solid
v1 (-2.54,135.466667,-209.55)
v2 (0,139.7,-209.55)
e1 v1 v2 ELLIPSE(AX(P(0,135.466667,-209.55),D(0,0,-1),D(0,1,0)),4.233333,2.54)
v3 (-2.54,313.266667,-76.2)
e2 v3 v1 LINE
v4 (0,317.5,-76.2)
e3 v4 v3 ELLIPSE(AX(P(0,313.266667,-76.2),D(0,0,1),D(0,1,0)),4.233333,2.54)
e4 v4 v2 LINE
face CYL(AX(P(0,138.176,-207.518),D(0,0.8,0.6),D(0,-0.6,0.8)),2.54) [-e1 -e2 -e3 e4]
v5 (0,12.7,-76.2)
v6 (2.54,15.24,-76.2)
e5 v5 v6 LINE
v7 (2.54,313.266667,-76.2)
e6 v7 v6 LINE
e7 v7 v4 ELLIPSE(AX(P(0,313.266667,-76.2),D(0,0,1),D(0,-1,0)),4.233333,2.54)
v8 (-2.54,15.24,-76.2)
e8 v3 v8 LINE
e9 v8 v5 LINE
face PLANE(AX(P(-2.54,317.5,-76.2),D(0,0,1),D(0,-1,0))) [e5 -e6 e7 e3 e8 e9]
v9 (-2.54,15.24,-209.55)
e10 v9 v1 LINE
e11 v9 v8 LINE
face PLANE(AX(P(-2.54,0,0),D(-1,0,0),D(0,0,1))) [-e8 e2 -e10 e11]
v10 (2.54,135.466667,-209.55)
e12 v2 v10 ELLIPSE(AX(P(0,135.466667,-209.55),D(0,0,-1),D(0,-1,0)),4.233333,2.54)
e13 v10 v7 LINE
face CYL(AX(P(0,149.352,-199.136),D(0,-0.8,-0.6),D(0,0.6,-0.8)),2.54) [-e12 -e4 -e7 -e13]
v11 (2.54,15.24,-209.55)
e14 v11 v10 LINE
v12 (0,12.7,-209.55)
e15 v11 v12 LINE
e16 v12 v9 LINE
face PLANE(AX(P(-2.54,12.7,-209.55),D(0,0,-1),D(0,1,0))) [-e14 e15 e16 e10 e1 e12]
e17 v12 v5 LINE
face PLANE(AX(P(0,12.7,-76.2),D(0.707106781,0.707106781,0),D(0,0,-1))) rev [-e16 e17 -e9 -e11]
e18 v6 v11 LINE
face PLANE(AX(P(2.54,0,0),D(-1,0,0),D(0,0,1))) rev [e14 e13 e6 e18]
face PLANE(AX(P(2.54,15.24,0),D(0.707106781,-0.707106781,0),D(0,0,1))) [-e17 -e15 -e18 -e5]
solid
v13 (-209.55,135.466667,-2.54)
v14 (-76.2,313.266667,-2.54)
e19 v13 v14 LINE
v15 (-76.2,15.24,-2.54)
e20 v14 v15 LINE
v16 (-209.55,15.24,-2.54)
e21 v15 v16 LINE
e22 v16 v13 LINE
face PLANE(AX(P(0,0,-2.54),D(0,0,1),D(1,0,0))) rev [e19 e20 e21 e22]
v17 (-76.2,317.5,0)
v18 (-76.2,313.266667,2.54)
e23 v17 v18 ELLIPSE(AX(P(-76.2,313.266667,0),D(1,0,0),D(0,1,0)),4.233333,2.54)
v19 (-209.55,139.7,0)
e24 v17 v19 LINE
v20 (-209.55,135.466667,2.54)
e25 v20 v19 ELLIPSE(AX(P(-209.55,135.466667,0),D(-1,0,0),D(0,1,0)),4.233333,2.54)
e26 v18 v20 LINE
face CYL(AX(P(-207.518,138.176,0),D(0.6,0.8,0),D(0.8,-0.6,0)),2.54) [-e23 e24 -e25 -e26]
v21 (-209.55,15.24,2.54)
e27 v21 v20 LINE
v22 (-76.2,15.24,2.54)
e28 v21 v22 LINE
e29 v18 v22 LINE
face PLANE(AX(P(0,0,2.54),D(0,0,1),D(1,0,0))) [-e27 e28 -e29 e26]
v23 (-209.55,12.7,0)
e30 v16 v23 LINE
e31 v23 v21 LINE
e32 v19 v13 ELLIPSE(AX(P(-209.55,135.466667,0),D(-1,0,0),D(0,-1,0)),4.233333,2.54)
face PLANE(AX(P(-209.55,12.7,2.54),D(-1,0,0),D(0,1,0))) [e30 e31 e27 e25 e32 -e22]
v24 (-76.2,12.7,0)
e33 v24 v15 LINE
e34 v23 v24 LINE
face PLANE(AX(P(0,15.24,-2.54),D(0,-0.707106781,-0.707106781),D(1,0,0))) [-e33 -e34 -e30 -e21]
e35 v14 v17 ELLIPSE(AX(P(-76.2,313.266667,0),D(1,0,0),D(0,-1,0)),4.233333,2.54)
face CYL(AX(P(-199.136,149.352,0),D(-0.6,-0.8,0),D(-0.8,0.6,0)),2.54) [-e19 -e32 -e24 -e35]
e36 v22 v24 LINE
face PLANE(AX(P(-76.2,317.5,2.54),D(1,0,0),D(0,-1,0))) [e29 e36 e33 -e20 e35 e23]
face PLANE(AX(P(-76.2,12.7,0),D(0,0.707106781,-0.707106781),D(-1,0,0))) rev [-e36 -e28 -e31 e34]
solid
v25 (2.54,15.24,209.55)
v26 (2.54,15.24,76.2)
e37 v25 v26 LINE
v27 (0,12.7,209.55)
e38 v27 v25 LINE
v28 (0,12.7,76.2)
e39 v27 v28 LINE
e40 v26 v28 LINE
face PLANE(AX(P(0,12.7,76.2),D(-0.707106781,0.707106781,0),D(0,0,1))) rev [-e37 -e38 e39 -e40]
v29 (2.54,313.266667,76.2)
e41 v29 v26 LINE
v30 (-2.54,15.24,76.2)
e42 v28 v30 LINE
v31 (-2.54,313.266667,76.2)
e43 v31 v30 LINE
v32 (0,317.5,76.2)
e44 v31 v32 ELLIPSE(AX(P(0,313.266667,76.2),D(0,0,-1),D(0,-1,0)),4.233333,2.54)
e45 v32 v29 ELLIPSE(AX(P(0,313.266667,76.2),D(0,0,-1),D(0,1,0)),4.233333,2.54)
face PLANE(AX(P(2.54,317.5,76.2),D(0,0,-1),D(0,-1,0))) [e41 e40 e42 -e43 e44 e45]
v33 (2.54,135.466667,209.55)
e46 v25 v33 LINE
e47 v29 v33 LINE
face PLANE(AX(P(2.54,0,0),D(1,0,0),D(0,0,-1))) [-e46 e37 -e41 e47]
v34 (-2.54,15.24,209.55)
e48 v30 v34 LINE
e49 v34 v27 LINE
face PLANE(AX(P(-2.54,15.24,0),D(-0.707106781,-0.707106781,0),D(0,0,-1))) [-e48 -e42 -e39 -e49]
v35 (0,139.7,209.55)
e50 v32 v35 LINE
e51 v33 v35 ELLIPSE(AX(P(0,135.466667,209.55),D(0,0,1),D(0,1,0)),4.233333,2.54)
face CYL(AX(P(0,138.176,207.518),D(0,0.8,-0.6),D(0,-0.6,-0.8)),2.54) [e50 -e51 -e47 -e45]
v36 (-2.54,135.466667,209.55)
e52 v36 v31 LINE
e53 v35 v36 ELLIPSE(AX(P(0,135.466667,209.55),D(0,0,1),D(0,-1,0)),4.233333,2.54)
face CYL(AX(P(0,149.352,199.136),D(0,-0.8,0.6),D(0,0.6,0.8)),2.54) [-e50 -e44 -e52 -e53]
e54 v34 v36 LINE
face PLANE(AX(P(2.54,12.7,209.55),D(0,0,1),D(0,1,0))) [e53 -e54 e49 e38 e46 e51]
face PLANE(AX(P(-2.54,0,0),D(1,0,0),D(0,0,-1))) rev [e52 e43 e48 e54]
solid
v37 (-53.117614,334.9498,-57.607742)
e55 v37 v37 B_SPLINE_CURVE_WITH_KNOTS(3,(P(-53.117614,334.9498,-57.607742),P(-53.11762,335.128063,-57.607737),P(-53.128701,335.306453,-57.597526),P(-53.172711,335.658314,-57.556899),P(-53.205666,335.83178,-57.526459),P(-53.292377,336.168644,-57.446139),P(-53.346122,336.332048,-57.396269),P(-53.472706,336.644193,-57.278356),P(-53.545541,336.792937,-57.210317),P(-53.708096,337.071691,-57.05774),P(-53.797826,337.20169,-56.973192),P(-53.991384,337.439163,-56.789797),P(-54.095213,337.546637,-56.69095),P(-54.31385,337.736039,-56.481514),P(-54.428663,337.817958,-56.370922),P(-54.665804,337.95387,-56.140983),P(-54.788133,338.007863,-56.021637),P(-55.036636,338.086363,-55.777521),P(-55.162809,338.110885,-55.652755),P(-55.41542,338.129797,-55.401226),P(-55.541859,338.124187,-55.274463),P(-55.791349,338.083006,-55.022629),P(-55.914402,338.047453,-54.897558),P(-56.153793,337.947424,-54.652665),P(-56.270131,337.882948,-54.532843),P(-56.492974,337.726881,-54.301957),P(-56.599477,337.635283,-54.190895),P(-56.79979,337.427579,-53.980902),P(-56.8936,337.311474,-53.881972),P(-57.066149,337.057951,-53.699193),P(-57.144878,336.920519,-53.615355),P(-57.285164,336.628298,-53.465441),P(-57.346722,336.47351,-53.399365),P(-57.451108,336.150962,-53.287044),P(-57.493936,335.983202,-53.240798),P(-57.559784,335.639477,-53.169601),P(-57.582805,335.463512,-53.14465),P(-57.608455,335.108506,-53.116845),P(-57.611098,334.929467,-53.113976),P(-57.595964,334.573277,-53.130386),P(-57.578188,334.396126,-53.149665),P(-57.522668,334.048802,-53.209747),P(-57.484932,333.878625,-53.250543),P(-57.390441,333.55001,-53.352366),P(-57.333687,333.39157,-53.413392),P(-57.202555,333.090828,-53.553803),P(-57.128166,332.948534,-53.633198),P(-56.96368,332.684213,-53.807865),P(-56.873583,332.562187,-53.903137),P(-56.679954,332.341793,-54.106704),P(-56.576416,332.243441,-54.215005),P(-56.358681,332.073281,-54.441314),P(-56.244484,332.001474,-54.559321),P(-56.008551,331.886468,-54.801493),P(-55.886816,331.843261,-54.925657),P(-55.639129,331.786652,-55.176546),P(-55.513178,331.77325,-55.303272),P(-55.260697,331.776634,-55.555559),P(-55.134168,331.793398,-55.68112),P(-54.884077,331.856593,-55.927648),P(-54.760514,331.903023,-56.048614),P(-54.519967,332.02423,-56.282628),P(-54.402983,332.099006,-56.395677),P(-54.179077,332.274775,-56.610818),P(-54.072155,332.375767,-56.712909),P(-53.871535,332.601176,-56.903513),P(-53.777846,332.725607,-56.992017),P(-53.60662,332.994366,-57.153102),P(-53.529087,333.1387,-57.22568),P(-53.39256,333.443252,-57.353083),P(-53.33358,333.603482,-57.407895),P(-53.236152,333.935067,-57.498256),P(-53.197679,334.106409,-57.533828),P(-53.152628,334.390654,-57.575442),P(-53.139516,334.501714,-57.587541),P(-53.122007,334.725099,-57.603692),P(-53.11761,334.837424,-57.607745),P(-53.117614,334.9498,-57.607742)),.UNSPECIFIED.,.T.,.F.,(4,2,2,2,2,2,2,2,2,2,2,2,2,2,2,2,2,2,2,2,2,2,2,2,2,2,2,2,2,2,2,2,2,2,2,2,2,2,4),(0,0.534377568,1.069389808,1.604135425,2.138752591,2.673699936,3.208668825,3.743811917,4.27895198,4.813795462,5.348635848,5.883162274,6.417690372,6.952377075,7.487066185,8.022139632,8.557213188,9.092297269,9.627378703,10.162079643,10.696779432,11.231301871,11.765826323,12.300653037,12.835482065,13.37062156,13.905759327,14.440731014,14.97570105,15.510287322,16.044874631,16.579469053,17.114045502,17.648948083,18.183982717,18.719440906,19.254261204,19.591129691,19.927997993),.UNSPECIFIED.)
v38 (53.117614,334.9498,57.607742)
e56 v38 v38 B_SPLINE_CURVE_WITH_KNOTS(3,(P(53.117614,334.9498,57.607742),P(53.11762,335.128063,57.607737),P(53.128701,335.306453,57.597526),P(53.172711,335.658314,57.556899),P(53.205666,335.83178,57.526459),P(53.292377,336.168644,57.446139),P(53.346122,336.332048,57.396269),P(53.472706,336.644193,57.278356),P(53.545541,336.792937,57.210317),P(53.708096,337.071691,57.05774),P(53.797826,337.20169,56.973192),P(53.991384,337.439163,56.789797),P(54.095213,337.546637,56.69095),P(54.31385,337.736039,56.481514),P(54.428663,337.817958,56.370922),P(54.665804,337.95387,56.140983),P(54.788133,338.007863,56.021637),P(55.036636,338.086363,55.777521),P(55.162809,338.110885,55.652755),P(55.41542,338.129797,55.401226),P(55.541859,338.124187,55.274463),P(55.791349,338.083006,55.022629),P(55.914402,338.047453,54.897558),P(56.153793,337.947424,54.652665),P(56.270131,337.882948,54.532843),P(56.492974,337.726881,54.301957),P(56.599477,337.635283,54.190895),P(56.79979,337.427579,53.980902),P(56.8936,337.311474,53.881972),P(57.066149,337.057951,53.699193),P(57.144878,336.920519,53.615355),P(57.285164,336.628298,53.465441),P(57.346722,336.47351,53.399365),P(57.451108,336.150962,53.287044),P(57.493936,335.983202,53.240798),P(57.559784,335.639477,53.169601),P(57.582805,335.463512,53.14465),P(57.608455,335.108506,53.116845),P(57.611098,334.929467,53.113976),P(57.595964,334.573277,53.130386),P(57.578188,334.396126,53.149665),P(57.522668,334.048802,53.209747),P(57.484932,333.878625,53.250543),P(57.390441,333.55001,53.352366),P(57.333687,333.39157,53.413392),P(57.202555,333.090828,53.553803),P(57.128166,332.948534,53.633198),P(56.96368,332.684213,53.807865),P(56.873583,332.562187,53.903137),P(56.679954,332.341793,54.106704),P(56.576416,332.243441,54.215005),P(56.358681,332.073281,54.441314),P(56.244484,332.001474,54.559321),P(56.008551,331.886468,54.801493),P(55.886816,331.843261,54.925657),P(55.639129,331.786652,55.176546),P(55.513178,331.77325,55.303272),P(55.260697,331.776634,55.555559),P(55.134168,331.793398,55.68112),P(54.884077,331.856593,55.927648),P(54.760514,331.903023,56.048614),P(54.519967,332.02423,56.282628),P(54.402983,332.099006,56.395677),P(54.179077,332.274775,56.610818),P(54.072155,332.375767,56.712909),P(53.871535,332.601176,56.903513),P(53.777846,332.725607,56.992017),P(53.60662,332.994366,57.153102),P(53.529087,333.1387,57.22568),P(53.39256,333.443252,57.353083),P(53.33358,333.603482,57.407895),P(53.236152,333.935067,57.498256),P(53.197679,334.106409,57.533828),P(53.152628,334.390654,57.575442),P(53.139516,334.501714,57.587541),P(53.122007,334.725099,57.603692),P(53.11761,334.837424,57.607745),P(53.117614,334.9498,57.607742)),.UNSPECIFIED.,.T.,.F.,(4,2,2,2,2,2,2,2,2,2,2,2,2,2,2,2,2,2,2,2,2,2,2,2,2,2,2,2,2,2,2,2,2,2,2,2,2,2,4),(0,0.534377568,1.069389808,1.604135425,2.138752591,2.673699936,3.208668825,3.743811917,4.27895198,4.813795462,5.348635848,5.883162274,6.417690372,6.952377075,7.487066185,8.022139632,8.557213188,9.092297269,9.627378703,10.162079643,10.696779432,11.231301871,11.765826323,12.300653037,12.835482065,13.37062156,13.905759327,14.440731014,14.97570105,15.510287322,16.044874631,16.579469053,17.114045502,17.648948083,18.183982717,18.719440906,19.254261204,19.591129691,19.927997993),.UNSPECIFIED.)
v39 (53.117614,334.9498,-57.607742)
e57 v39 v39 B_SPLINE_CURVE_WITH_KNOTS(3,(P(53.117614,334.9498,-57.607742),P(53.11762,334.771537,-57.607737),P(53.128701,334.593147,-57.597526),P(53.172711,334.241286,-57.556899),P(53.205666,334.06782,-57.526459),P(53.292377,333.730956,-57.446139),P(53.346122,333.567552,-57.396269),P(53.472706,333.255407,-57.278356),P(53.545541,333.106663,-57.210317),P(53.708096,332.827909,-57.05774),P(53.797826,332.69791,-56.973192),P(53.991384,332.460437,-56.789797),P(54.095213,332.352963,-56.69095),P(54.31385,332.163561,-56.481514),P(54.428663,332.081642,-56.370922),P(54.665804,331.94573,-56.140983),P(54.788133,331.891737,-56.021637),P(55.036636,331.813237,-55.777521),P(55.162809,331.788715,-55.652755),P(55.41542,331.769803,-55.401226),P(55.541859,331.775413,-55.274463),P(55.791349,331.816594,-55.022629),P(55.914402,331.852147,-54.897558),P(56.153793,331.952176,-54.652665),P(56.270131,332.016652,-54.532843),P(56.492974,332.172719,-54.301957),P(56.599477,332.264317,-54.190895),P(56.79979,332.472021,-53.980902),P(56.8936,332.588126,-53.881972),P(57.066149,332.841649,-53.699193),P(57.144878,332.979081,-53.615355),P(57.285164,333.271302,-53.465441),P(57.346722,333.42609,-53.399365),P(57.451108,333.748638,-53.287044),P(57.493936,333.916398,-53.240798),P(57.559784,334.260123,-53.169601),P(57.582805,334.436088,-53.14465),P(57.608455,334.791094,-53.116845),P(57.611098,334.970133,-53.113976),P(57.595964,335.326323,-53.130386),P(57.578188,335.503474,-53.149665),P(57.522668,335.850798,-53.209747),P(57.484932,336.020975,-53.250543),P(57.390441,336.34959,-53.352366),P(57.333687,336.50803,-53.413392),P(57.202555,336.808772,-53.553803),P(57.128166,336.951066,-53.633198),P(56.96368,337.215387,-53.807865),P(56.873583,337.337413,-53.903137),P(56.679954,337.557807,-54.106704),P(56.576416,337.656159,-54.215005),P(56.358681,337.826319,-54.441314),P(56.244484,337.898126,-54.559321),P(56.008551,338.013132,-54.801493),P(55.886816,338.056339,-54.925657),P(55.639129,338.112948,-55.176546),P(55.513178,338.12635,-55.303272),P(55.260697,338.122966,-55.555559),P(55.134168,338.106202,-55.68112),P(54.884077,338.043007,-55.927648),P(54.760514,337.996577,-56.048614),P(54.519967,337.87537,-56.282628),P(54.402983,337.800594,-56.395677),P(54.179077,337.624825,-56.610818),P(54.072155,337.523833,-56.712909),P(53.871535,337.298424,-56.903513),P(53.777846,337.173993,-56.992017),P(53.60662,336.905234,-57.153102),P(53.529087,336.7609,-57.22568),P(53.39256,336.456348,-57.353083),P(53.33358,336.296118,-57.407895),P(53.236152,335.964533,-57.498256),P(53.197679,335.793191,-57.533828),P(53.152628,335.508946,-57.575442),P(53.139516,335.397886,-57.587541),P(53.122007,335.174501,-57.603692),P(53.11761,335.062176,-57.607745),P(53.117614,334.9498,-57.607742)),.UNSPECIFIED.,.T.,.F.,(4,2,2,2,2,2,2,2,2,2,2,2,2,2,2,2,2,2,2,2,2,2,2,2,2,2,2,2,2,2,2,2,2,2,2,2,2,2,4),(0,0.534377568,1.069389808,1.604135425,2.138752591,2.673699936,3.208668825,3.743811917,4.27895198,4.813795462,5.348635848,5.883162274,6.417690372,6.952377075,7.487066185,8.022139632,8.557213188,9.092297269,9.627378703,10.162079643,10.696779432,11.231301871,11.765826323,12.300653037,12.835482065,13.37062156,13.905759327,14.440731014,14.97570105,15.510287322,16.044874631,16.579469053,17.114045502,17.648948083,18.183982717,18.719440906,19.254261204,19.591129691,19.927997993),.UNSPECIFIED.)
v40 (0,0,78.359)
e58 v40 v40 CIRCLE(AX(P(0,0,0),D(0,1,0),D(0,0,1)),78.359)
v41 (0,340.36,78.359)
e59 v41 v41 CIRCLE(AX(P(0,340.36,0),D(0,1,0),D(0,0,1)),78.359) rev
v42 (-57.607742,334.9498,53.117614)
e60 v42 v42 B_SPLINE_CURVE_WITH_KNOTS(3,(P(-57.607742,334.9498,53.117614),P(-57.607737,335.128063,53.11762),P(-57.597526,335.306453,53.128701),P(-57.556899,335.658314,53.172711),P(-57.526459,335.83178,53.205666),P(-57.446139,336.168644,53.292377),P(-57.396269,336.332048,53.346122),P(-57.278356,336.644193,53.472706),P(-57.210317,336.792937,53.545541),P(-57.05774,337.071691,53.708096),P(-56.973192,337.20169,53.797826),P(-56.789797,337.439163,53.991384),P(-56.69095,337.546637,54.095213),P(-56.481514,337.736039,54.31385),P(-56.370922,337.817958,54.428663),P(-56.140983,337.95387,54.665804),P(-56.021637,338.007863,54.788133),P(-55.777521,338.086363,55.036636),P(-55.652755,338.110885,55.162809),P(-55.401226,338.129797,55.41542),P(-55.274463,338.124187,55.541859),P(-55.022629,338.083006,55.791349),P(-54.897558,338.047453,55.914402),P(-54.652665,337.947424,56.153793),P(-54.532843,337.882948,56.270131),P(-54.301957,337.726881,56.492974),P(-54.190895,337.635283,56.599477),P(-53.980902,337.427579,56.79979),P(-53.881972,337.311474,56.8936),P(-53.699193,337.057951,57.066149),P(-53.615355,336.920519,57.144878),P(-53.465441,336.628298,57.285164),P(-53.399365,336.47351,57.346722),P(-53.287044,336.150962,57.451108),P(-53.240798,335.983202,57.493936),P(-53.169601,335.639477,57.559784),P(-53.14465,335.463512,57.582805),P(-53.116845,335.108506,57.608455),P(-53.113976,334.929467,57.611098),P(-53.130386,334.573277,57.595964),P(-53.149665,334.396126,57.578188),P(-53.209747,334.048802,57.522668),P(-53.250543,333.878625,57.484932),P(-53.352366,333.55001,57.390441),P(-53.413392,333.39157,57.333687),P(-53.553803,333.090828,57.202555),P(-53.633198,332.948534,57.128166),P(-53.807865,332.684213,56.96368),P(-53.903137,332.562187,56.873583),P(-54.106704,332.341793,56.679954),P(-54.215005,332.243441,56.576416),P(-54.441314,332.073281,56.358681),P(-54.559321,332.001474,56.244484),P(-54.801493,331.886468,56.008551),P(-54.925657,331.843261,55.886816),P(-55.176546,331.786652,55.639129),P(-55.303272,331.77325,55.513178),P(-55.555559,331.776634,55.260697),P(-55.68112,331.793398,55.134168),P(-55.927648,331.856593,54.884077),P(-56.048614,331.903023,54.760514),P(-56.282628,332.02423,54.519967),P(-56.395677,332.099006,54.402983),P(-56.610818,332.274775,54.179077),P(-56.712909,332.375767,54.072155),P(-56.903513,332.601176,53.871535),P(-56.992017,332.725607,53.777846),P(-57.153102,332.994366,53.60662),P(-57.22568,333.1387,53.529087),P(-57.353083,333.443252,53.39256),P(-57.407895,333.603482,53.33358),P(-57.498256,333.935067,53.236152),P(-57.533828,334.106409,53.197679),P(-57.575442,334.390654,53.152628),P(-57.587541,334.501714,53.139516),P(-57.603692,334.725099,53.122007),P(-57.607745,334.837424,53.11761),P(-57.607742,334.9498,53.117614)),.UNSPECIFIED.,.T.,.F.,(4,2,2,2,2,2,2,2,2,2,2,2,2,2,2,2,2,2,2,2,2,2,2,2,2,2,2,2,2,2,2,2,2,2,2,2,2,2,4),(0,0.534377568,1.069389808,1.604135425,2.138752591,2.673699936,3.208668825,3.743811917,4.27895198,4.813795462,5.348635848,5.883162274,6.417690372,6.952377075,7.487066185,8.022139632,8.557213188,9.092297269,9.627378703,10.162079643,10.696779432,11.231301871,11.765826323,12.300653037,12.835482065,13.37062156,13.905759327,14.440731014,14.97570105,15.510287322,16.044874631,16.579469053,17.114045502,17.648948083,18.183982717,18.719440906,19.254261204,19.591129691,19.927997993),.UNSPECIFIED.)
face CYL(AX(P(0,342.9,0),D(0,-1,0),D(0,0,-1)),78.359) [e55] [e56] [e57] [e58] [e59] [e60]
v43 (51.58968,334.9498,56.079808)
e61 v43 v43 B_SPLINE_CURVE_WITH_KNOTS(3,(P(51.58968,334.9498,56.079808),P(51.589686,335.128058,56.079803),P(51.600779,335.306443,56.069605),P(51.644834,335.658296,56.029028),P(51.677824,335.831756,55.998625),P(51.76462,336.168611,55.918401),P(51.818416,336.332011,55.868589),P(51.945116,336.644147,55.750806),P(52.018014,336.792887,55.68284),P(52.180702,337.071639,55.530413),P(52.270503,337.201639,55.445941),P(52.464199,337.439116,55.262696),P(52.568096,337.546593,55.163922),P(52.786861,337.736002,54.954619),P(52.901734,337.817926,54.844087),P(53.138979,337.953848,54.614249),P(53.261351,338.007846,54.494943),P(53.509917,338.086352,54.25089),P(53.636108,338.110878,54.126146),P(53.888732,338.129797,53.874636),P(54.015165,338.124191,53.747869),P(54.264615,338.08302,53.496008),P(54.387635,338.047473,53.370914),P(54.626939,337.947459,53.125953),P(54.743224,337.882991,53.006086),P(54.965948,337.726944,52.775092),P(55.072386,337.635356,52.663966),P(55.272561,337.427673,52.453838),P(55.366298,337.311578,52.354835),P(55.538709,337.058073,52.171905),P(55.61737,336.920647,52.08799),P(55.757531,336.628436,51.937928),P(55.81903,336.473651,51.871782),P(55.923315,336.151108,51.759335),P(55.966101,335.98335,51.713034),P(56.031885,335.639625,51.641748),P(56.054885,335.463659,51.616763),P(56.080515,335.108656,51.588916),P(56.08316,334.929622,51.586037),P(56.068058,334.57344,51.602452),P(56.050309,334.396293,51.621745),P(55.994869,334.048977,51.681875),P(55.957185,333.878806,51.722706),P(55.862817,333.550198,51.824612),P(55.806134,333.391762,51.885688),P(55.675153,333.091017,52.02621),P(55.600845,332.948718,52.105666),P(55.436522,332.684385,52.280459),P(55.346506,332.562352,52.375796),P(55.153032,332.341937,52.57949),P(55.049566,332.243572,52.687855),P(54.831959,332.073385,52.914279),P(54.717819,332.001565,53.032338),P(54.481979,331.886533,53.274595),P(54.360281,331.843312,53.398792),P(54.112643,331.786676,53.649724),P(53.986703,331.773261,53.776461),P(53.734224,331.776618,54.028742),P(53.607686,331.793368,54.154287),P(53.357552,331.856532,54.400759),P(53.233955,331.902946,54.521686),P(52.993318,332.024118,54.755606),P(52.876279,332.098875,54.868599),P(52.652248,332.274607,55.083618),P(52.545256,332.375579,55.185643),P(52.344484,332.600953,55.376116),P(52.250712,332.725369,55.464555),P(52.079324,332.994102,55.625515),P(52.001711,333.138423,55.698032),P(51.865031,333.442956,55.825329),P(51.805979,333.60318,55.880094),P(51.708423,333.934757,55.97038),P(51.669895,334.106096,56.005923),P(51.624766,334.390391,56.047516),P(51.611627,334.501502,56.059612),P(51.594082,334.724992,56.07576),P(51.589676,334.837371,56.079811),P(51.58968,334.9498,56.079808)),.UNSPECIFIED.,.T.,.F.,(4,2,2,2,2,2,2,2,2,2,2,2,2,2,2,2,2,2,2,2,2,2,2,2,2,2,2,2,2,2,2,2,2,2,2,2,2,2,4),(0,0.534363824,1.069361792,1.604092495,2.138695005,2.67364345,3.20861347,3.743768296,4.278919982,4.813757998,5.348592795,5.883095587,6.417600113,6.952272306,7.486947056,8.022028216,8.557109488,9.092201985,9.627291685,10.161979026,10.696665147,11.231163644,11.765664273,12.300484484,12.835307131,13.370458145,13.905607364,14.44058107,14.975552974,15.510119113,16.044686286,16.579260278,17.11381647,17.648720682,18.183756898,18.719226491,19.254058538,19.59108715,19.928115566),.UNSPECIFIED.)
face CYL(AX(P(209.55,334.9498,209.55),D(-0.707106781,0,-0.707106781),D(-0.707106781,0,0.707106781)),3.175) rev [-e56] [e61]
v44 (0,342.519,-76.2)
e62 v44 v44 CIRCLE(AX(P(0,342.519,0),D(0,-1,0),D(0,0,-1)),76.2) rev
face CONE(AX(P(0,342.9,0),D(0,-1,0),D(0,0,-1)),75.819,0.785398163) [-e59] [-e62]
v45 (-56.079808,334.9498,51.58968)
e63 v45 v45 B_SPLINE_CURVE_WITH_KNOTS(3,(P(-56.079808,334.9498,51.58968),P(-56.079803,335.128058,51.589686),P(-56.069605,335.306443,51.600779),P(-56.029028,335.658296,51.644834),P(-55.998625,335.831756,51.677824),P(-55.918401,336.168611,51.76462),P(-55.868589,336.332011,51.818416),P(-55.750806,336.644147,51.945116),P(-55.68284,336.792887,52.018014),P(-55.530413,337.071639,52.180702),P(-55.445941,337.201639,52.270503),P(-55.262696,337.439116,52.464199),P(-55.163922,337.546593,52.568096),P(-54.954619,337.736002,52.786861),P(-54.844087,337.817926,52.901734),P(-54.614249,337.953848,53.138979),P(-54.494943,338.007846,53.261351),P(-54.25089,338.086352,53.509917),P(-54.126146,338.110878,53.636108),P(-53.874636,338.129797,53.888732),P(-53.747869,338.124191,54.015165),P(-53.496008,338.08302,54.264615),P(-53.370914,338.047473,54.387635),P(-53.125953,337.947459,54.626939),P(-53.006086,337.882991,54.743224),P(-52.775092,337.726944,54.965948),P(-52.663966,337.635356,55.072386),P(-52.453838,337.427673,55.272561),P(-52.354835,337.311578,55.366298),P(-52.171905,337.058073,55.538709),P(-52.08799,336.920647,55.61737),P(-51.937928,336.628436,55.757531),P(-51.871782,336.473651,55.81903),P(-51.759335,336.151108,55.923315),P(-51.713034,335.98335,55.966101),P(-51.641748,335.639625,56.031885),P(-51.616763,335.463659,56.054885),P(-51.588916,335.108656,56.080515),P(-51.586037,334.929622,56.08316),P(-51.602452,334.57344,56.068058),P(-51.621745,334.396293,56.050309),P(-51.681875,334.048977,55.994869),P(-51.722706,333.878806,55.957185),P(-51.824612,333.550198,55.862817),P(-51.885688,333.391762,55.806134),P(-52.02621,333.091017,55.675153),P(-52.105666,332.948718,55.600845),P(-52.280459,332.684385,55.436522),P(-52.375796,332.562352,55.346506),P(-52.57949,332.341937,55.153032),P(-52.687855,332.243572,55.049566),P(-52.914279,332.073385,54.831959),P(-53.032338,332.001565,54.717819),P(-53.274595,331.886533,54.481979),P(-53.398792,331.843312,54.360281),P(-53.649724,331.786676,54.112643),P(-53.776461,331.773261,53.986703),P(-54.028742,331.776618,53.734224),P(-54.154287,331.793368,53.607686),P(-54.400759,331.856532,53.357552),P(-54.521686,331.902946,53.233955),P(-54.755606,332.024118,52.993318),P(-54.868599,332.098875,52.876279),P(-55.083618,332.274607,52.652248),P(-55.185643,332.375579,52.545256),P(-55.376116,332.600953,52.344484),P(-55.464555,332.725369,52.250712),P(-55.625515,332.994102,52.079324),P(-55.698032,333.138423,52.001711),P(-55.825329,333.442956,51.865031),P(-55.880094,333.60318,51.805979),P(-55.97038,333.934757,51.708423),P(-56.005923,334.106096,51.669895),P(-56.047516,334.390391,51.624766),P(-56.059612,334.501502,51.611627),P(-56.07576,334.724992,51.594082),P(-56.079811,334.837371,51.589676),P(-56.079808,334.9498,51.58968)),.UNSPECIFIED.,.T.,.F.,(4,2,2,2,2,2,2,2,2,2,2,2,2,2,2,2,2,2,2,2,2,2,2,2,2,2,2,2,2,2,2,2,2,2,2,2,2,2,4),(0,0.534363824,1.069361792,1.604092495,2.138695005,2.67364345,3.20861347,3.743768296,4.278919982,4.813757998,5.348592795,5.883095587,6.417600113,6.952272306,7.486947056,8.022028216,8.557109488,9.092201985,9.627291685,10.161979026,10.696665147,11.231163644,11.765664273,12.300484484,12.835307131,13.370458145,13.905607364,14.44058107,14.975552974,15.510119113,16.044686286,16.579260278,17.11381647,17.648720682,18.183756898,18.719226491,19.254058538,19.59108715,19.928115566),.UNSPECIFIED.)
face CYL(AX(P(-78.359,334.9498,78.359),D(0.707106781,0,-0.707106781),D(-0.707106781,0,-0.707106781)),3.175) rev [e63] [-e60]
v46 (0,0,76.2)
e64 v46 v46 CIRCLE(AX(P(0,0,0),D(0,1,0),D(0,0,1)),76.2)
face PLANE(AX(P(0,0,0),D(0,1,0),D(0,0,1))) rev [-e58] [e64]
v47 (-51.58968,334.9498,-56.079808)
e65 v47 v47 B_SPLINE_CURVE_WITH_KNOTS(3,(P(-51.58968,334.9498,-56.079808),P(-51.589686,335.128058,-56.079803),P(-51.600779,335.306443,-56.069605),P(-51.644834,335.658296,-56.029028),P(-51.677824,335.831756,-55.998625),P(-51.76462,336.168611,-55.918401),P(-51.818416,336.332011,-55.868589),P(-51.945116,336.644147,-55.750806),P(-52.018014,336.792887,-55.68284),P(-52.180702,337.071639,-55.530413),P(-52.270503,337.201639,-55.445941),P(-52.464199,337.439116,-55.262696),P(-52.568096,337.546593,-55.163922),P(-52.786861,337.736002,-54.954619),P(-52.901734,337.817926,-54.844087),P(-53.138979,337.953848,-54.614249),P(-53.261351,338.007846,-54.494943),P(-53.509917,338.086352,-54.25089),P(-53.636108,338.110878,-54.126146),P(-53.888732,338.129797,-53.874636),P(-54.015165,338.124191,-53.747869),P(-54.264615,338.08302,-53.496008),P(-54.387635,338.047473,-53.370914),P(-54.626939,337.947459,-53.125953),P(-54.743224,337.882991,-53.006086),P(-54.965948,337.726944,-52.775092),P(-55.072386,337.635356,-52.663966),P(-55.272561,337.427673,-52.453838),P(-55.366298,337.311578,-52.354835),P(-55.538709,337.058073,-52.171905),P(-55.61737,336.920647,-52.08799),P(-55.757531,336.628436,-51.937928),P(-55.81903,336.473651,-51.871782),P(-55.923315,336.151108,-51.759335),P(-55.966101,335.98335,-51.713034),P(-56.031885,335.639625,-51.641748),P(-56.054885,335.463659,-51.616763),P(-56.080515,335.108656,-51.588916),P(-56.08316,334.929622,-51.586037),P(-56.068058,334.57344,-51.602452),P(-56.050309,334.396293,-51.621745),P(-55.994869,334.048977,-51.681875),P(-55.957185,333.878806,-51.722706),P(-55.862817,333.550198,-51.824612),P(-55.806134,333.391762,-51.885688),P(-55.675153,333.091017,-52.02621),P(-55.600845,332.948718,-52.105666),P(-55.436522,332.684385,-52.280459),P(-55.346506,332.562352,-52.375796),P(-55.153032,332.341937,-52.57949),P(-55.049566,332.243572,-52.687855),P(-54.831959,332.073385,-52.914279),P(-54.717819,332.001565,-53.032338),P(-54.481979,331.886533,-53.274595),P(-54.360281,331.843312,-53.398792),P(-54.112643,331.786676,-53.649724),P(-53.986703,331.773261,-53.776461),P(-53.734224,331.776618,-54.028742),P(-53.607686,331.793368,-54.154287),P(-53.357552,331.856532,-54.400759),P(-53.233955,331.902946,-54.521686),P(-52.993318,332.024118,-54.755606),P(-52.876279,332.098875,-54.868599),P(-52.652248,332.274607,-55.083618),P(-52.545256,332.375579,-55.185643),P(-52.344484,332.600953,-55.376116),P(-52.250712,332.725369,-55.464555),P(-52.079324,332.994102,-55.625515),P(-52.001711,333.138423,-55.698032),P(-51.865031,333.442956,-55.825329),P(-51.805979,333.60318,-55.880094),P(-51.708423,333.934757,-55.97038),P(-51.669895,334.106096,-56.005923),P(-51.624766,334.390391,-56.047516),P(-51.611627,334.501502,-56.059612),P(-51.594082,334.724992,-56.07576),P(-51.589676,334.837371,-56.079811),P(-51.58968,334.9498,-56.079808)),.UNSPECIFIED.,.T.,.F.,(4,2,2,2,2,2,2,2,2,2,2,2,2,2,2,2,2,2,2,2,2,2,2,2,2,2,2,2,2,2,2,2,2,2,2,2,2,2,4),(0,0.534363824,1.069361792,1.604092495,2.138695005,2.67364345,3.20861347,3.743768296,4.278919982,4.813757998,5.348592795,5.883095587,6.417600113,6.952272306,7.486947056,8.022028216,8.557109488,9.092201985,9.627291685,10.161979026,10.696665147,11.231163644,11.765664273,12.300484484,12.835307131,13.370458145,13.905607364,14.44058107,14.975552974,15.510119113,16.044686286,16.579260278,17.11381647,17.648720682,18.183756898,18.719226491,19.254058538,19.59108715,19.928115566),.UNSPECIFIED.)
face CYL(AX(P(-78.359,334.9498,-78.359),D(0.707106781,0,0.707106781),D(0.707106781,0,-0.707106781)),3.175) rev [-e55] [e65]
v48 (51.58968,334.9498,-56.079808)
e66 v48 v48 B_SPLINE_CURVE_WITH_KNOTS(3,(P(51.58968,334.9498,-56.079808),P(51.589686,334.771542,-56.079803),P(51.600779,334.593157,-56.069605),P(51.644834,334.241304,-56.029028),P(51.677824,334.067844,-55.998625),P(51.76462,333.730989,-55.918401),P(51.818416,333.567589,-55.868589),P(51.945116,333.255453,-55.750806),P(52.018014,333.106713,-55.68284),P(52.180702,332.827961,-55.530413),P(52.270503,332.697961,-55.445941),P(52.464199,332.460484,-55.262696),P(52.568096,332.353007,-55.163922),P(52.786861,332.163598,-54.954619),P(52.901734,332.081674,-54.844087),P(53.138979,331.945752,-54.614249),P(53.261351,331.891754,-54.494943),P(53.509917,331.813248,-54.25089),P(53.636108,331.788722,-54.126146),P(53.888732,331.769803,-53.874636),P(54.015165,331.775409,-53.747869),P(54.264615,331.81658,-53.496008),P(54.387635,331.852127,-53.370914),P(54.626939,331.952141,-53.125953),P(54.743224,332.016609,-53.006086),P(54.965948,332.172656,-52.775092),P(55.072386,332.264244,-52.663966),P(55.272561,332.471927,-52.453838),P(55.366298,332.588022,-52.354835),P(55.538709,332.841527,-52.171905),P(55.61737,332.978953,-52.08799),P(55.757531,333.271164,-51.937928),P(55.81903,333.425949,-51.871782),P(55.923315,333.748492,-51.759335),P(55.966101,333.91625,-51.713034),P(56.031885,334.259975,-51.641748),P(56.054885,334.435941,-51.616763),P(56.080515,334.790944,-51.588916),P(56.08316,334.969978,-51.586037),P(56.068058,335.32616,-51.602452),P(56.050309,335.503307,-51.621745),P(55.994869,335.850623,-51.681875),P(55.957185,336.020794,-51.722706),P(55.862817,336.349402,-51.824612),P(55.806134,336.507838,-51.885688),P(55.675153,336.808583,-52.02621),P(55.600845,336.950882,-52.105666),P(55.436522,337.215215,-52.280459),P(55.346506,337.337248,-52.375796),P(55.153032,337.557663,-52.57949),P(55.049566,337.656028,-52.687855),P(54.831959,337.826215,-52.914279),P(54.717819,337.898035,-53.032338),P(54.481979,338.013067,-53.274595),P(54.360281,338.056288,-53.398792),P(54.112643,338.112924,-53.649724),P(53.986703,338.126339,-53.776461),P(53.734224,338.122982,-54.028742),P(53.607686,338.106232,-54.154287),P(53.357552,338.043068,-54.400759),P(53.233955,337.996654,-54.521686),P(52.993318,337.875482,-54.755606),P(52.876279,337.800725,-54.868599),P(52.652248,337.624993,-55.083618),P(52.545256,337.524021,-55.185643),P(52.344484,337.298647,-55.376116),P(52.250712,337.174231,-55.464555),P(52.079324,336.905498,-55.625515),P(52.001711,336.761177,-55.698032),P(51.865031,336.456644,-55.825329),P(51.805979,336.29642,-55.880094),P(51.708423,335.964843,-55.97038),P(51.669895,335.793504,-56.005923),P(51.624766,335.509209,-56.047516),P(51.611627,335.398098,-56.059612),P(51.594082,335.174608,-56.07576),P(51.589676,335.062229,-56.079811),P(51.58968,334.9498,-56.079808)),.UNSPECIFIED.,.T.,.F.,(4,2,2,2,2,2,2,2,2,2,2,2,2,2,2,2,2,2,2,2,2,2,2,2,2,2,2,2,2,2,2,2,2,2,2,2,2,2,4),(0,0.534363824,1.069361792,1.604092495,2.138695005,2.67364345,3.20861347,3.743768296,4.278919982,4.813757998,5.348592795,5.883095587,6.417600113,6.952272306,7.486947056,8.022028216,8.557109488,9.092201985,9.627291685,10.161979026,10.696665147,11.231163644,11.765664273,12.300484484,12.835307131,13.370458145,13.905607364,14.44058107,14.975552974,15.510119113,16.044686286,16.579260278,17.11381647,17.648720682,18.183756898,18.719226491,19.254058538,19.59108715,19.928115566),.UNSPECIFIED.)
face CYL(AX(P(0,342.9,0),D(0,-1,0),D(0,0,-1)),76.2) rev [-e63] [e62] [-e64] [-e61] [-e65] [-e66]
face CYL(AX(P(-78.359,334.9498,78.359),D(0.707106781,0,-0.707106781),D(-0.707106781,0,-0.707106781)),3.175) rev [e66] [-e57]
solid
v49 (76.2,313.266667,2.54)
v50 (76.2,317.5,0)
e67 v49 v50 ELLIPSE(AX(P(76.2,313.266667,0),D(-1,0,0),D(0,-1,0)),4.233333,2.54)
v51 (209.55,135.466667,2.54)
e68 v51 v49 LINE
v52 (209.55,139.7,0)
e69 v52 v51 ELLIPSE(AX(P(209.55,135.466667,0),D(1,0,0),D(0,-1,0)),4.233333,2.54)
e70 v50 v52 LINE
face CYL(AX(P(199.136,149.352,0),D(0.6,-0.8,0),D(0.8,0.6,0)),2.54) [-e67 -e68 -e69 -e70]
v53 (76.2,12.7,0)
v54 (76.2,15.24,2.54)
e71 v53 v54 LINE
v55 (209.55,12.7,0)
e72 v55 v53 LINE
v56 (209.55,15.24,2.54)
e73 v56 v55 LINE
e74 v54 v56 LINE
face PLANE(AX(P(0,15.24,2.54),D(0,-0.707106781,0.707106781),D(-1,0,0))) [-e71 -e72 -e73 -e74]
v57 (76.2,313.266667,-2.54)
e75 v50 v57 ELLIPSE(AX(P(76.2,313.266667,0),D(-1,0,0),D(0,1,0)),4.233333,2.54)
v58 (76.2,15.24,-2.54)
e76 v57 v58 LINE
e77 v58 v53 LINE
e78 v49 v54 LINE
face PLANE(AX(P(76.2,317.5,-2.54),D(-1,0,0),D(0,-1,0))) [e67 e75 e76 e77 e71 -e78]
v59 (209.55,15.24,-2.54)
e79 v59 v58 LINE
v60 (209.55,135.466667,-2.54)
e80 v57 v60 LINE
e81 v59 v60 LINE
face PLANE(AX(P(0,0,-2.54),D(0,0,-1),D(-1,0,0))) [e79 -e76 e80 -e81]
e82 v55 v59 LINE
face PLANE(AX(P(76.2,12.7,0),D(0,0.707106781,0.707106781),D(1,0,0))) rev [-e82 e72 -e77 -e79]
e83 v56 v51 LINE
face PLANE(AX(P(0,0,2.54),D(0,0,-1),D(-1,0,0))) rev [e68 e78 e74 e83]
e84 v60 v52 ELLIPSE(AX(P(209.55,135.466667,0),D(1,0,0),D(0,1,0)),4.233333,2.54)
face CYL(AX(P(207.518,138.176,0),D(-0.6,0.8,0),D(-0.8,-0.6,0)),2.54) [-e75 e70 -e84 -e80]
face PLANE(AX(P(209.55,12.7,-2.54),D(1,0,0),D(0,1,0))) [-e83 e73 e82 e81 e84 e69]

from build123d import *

# Parameters (mm, degrees)
SKETCH1_R                = 78.359
SKETCH1_R_2              = 76.2
BOSS_EXTRUDE1_DEPTH      = 342.9
BOSS_EXTRUDE2_DEPTH      = 2.54
BOSS_EXTRUDE2_DEPTH_BACK = 2.54
FILLET2_R                = 2.54
CHAMFER2_SIZE            = 2.54
CIRPATTERN1_COUNT        = 4
SKETCH4_R                = 3.175
CUT_EXTRUDE1_DEPTH       = 454.213873353
CIRPATTERN2_COUNT        = 4
CHAMFER3_SIZE            = 2.54


# Some blends are built 0.0001 mm under size
with BuildPart() as part:
    # Sketch1 → Boss-Extrude1 (new body)
    with BuildSketch(Plane(origin=(0, 0, 0), x_dir=(1, 0, 0), z_dir=(0, 1, 0))):
        with Locations(Location((0, 0, 0), (0, 0, 270))):
            Circle(SKETCH1_R)
        with Locations(Location((0, 0, 0), (0, 0, 270))):
            Circle(SKETCH1_R_2, mode=Mode.SUBTRACT)
    extrude(amount=BOSS_EXTRUDE1_DEPTH)

    # Sketch4 → Cut-Extrude1 (cut, through all)
    with BuildSketch(Plane(origin=(0, 0, 0), x_dir=(-0.7071067811865462, 0, 0.7071067811865489), z_dir=(-0.7071067811865489, 0, -0.7071067811865462))):
        with Locations((0, 334.9498)):
            Circle(SKETCH4_R)
    cut_extrude1 = extrude(amount=-CUT_EXTRUDE1_DEPTH, mode=Mode.SUBTRACT)

    # CirPattern2: Cut-Extrude1 ×4 about axis
    cirpattern2_axis = Axis((0, -69.284011973, 0), (0, 1, 0))
    for i in range(1, CIRPATTERN2_COUNT):
        add(cut_extrude1.rotate(cirpattern2_axis, i * 360 / CIRPATTERN2_COUNT), mode=Mode.SUBTRACT)

    # Chamfer3
    # the kernel refuses this chamfer: 2.54 mm, written as the material it takes off along each edge
    with BuildSketch(Plane(origin=(0, 342.9, 0), x_dir=(0, 0, 1), z_dir=(-1, 0, 0))) as chamfer3_piece_1:
        Polygon((78.359, -CHAMFER3_SIZE), (78.359 - CHAMFER3_SIZE, 0), (78.359, 0), align=None)
    revolve(axis=Axis((0, 342.9, 0), (0, 1, 0)), mode=Mode.SUBTRACT)


with BuildPart() as body_2:
    # Sketch2 → Boss-Extrude2 (new, two sides: drawn at the far end of the back side and taken through both)
    with BuildSketch(Plane.XY.offset(-BOSS_EXTRUDE2_DEPTH_BACK)):
        Polygon((76.2, 317.5), (76.2, 12.7), (209.55, 12.7), (209.55, 139.7), align=None)
    extrude(amount=BOSS_EXTRUDE2_DEPTH + BOSS_EXTRUDE2_DEPTH_BACK)

    # Fillet2
    fillet2_edges = [body_2.edges().sort_by_distance(p)[0] for p in [
        (142.875, 228.6, -2.54),
        (142.875, 228.6, 2.54),
    ]]
    fillet(fillet2_edges, radius=FILLET2_R - 0.0001)  # a hair under: the kernel refuses the full size

    # Chamfer2
    chamfer2_edges = [body_2.edges().sort_by_distance(p)[0] for p in [
        (142.875, 12.7, -2.54),
        (142.875, 12.7, 2.54),
    ]]
    chamfer(chamfer2_edges, length=CHAMFER2_SIZE - 0.0001)  # a hair under: the kernel refuses the full size


with BuildPart() as cirpattern1_1:
    # CirPattern1: pattern copy
    add(body_2.part.rotate(Axis((0, 0, 0), (0, 1, 0)), 1 * 360 / CIRPATTERN1_COUNT))


with BuildPart() as cirpattern1_2:
    # CirPattern1: pattern copy
    add(body_2.part.rotate(Axis((0, 0, 0), (0, 1, 0)), 2 * 360 / CIRPATTERN1_COUNT))


with BuildPart() as cirpattern1_3:
    # CirPattern1: pattern copy
    add(body_2.part.rotate(Axis((0, 0, 0), (0, 1, 0)), 3 * 360 / CIRPATTERN1_COUNT))


solid = Compound([part.part, body_2.part, cirpattern1_1.part, cirpattern1_2.part, cirpattern1_3.part])
